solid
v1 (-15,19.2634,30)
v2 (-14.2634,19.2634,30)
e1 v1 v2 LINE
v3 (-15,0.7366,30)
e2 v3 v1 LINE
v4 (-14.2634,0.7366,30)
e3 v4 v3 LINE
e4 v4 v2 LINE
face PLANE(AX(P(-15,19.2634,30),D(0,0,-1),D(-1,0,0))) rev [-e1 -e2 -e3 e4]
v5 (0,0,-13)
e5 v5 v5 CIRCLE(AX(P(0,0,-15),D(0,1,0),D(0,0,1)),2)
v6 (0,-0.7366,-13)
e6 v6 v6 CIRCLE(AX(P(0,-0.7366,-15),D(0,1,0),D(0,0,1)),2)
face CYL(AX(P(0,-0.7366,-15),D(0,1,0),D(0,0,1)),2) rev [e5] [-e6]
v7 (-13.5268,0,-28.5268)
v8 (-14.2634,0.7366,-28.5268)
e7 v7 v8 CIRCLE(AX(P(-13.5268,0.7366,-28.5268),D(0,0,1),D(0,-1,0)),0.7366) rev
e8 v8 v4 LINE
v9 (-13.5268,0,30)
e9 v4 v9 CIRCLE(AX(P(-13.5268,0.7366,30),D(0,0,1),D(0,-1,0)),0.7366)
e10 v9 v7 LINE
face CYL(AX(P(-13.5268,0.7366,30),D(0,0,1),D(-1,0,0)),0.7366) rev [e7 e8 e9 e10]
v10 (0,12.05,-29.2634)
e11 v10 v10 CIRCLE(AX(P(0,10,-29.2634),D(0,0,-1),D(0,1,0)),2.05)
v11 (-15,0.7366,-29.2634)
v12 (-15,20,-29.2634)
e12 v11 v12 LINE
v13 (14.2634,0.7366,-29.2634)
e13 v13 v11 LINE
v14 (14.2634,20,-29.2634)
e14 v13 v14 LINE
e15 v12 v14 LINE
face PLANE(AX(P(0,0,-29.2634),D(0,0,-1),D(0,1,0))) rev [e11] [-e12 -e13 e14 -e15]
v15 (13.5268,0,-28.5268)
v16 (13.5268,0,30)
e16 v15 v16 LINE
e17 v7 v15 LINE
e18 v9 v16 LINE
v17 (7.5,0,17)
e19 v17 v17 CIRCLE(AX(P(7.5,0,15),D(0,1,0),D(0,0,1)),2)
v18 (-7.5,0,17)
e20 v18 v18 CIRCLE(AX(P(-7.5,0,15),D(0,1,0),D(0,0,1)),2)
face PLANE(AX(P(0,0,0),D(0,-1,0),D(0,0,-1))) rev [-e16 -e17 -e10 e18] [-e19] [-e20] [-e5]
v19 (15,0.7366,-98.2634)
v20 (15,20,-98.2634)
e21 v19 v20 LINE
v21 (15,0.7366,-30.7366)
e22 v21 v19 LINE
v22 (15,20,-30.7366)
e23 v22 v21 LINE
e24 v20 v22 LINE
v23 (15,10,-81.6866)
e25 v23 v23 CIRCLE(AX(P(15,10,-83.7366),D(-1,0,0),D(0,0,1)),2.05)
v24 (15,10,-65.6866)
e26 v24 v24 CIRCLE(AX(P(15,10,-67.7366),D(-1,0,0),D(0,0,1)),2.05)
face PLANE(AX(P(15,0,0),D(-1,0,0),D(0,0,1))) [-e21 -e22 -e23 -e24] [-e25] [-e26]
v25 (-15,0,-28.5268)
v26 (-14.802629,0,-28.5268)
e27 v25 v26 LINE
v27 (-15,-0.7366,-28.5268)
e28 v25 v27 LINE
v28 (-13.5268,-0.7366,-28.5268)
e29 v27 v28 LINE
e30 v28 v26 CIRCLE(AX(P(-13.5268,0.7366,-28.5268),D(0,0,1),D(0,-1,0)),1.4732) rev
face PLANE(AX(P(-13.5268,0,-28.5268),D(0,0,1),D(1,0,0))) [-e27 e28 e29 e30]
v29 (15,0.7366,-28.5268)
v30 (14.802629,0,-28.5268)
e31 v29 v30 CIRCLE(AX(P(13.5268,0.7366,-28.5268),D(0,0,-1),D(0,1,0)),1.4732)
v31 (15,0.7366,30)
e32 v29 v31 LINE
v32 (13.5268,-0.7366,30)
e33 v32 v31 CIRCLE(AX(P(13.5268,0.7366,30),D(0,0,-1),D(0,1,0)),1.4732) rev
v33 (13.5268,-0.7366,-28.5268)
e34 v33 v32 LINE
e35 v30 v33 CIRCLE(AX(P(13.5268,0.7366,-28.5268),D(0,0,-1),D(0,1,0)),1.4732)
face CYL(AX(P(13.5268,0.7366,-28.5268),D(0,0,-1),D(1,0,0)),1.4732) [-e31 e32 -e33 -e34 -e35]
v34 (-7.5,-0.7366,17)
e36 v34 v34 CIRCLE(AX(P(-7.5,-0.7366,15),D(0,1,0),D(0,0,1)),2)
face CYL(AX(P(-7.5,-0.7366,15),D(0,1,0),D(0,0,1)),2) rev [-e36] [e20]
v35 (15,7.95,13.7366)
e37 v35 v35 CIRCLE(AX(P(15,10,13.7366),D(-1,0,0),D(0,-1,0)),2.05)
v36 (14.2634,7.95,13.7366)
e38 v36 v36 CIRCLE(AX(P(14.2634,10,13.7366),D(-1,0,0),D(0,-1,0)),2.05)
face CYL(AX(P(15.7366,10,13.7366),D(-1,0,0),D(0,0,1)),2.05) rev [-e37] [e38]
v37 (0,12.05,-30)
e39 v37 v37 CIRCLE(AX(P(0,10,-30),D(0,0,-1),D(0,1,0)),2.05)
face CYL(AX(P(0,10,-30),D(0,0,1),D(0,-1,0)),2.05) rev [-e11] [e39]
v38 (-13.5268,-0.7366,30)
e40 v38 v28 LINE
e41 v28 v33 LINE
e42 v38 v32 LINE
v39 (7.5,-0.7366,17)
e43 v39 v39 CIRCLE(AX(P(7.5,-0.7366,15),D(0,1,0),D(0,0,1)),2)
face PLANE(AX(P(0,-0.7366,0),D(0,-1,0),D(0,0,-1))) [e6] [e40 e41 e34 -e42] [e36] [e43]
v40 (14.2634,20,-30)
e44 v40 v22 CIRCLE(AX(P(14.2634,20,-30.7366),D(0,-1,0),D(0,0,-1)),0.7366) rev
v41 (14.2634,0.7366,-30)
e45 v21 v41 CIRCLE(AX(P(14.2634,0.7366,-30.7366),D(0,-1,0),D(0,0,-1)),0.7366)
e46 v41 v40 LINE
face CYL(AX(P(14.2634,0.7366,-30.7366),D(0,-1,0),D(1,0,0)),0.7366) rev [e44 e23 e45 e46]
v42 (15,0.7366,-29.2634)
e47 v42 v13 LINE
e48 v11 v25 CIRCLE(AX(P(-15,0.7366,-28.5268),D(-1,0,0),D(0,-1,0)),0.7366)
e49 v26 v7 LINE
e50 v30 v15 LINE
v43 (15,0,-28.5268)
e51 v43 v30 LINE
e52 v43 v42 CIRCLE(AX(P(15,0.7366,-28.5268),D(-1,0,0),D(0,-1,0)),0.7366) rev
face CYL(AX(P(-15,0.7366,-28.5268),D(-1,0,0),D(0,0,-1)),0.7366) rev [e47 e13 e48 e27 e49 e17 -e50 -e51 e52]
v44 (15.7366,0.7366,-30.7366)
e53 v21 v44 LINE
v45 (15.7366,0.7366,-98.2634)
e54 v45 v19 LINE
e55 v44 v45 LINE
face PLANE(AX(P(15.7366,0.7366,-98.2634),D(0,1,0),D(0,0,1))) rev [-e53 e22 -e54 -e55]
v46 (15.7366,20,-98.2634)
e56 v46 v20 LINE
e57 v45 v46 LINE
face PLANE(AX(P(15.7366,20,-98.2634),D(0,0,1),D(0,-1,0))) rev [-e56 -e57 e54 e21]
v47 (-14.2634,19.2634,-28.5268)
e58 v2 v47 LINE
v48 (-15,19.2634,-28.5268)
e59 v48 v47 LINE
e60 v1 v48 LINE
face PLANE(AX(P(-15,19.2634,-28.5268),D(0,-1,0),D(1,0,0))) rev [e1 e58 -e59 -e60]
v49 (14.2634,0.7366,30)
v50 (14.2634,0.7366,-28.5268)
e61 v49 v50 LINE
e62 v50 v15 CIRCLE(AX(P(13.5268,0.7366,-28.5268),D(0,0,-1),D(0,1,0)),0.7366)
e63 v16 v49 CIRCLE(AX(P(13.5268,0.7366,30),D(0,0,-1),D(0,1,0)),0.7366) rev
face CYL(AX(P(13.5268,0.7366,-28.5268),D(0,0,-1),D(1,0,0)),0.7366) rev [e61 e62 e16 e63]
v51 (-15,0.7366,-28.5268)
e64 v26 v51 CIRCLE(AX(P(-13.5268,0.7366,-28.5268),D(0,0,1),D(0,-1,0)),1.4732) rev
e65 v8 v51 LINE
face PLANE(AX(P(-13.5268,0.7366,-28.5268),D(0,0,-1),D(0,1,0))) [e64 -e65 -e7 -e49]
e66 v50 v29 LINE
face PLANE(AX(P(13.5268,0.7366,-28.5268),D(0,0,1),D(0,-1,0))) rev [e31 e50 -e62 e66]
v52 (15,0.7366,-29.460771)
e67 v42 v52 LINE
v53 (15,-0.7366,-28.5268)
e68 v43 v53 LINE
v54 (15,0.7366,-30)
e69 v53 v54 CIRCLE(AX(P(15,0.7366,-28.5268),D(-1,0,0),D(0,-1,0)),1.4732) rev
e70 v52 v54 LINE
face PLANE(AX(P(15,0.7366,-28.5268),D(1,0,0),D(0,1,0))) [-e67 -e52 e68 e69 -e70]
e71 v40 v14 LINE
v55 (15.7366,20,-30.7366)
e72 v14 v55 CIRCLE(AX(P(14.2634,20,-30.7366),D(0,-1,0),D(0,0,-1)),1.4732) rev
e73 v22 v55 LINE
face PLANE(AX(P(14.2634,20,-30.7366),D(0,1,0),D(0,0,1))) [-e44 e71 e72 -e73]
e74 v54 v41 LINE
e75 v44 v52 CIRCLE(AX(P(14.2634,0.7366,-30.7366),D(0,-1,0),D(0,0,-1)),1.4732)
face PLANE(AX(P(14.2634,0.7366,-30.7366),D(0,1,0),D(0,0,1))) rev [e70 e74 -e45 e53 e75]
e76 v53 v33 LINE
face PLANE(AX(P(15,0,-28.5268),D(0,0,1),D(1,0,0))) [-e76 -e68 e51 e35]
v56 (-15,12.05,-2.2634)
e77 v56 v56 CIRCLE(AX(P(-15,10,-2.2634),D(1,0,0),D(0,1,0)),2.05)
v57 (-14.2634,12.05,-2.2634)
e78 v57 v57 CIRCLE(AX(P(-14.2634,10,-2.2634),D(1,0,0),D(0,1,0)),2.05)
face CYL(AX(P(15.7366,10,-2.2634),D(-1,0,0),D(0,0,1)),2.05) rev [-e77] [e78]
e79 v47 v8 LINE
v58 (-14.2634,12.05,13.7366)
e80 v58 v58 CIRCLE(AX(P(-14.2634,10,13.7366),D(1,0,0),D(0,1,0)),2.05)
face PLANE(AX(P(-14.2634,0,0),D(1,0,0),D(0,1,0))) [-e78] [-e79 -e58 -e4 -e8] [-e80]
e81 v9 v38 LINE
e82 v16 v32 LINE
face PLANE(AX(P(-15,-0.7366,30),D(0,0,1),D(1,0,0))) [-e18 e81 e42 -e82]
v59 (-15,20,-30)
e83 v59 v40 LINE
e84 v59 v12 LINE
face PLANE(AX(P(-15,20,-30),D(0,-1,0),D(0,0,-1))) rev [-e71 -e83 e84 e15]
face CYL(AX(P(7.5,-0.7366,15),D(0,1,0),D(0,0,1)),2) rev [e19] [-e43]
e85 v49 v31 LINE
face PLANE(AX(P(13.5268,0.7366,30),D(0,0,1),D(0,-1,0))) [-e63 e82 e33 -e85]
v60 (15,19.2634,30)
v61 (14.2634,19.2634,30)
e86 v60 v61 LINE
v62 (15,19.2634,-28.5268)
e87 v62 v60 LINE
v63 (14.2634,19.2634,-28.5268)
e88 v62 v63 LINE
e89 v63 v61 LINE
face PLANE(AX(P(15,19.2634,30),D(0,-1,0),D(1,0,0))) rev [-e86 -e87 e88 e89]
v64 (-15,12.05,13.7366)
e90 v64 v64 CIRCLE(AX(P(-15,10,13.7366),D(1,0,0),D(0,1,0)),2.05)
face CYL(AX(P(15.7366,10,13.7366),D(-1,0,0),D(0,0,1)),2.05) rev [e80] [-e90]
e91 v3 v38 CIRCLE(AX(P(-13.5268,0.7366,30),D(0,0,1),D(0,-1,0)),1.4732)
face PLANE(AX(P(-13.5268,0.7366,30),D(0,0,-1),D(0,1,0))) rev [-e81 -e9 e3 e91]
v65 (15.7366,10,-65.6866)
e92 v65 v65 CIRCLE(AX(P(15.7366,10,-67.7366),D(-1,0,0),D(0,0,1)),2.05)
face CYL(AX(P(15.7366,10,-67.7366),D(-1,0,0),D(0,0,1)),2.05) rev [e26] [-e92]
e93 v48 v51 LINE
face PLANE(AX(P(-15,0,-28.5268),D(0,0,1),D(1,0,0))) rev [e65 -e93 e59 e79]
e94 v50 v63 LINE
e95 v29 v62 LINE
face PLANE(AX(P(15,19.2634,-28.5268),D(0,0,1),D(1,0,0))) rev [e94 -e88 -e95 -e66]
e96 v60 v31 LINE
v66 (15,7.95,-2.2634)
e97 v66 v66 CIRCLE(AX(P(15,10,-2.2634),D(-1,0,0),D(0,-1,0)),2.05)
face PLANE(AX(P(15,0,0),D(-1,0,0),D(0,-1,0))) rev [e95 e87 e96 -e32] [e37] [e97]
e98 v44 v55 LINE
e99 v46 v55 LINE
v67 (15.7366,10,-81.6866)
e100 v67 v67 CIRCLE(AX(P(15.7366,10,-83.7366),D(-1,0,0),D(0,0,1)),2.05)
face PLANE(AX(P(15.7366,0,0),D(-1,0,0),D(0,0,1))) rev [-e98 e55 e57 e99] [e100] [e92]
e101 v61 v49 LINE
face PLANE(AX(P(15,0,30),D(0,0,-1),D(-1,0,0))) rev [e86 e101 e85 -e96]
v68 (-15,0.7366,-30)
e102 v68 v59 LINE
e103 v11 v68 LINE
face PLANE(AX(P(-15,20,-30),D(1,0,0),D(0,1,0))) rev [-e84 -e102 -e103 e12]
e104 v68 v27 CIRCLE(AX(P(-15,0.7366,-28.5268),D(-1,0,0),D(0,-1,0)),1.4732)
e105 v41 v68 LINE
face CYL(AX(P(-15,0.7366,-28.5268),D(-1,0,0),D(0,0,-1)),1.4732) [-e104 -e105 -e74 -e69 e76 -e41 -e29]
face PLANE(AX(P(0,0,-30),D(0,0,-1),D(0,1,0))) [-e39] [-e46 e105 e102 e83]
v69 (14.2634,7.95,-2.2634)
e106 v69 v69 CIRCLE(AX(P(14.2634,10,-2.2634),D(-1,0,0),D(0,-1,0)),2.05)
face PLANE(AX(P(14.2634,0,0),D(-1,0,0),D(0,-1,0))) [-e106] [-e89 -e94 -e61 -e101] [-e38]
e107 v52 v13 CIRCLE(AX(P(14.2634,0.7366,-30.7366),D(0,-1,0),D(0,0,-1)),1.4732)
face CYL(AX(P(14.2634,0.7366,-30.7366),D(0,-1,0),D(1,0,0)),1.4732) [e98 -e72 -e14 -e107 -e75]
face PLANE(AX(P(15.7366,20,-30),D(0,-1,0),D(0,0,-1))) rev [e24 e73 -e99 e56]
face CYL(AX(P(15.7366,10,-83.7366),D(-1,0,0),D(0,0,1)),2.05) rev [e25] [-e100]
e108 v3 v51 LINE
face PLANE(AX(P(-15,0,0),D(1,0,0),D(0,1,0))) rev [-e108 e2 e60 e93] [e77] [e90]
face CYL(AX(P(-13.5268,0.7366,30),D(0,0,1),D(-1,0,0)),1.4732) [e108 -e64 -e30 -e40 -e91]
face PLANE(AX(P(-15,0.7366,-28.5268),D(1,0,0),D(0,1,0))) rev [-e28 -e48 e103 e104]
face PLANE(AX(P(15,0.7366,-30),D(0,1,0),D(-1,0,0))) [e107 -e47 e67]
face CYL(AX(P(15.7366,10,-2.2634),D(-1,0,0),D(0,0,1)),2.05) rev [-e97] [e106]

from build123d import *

# Parameters (mm, degrees)
SKETCH1_W                    = 30
SKETCH1_H                    = 60
SKETCH1_R                    = 2
BASE_FLANGE1_DEPTH           = 0.7366
EDGE_FLANGE1_STRIP_W         = 4.4196
EDGE_FLANGE1_STRIP_H         = 0.7366
EDGE_FLANGE1_STRIP_CUT_DEPTH = 30
EDGE_FLANGE1_DEPTH           = 30
EDGE_FLANGE1_PROFILE_W       = 30
EDGE_FLANGE1_PROFILE_H       = 19.2634
EDGE_FLANGE1_PROFILE_R       = 2.05
EDGE_FLANGE1_FLAT_DEPTH      = 0.7366
EDGE_FLANGE2_STRIP_W         = 4.4196
EDGE_FLANGE2_STRIP_H         = 0.7366
EDGE_FLANGE2_STRIP_CUT_DEPTH = 58.5268
EDGE_FLANGE2_DEPTH           = 58.5268
EDGE_FLANGE3_STRIP_W         = 4.4196
EDGE_FLANGE3_STRIP_H         = 0.7366
EDGE_FLANGE3_STRIP_CUT_DEPTH = 58.5268
EDGE_FLANGE3_DEPTH           = 58.5268
EDGE_FLANGE4_STRIP_W         = 4.4196
EDGE_FLANGE4_STRIP_H         = 0.7366
EDGE_FLANGE4_STRIP_CUT_DEPTH = 19.2634
EDGE_FLANGE4_DEPTH           = 19.2634
SKETCH18_R                   = 2.05
CUT_EXTRUDE1_DEPTH           = 409.590672417


# Sheet-metal steps are written as plain solids
with BuildPart() as part:
    # Sketch1 → Base-Flange1 (new body)
    with BuildSketch(Plane(origin=(0, 0, 0), x_dir=(1, 0, 0), z_dir=(0, 1, 0))):
        Rectangle(SKETCH1_W, SKETCH1_H)
        with Locations(Location((7.5, -15, 0), (0, 0, 270))):
            Circle(SKETCH1_R, mode=Mode.SUBTRACT)
        with Locations(Location((0, 15, 0), (0, 0, 270))):
            Circle(SKETCH1_R, mode=Mode.SUBTRACT)
        with Locations(Location((-7.5, -15, 0), (0, 0, 270))):
            Circle(SKETCH1_R, mode=Mode.SUBTRACT)
    extrude(amount=-BASE_FLANGE1_DEPTH)

    # Edge-Flange1 strip (across the edge) → Edge-Flange1 strip cut (cut)
    with BuildSketch(Plane(origin=(15, 0, -30), x_dir=(0, 0, 1), z_dir=(-1, 0, 0))):
        with Locations((-0.7366, -0.3683)):
            Rectangle(EDGE_FLANGE1_STRIP_W, EDGE_FLANGE1_STRIP_H)
    extrude(amount=EDGE_FLANGE1_STRIP_CUT_DEPTH, mode=Mode.SUBTRACT)

    # Edge-Flange1 bend section (across the edge) → Edge-Flange1 (add)
    with BuildSketch(Plane(origin=(15, 0, -30), x_dir=(0, 0, 1), z_dir=(-1, 0, 0))):
        with BuildLine():
            Line((0, 0.7366), (0.7366, 0.7366))
            ThreePointArc((0.7366, 0.7366), (0.952345145, 0.215745145), (1.4732, 0))
            Line((1.4732, 0), (1.4732, -0.7366))
            ThreePointArc((1.4732, -0.7366), (0.43149029, -0.30510971), (0, 0.7366))
        make_face()
    extrude(amount=EDGE_FLANGE1_DEPTH)

    # Edge-Flange1 profile (on flange) → Edge-Flange1 flat (add)
    with BuildSketch(Plane(origin=(0, 0, -30), x_dir=(-1, 0, 0), z_dir=(0, 0, -1))):
        with Locations((0, 10.3683)):
            Rectangle(EDGE_FLANGE1_PROFILE_W, EDGE_FLANGE1_PROFILE_H)
        with Locations((0, 10)):
            Circle(EDGE_FLANGE1_PROFILE_R, mode=Mode.SUBTRACT)
    extrude(amount=-EDGE_FLANGE1_FLAT_DEPTH)

    # Edge-Flange2 strip (across the edge) → Edge-Flange2 strip cut (cut)
    with BuildSketch(Plane(origin=(15, 0, 30), x_dir=(-1, 0, 0), z_dir=(0, 0, -1))):
        with Locations((-0.7366, -0.3683)):
            Rectangle(EDGE_FLANGE2_STRIP_W, EDGE_FLANGE2_STRIP_H)
    extrude(amount=EDGE_FLANGE2_STRIP_CUT_DEPTH, mode=Mode.SUBTRACT)

    # Edge-Flange2 section (across the edge) → Edge-Flange2 (add)
    with BuildSketch(Plane(origin=(15, 0, 30), x_dir=(-1, 0, 0), z_dir=(0, 0, -1))):
        with BuildLine():
            Line((0, 0.7366), (0, 19.2634))
            Line((0, 19.2634), (0.7366, 19.2634))
            Line((0.7366, 19.2634), (0.7366, 0.7366))
            ThreePointArc((0.7366, 0.7366), (0.952345145, 0.215745145), (1.4732, 0))
            Line((1.4732, 0), (1.4732, -0.7366))
            ThreePointArc((1.4732, -0.7366), (0.43149029, -0.30510971), (0, 0.7366))
        make_face()
    extrude(amount=EDGE_FLANGE2_DEPTH)

    # Edge-Flange3 strip (across the edge) → Edge-Flange3 strip cut (cut)
    with BuildSketch(Plane(origin=(-15, 0, -28.5268), x_dir=(1, 0, 0), z_dir=(0, 0, 1))):
        with Locations((-0.7366, -0.3683)):
            Rectangle(EDGE_FLANGE3_STRIP_W, EDGE_FLANGE3_STRIP_H)
    extrude(amount=EDGE_FLANGE3_STRIP_CUT_DEPTH, mode=Mode.SUBTRACT)

    # Edge-Flange3 section (across the edge) → Edge-Flange3 (add)
    with BuildSketch(Plane(origin=(-15, 0, -28.5268), x_dir=(1, 0, 0), z_dir=(0, 0, 1))):
        with BuildLine():
            Line((0, 0.7366), (0, 19.2634))
            Line((0, 19.2634), (0.7366, 19.2634))
            Line((0.7366, 19.2634), (0.7366, 0.7366))
            ThreePointArc((0.7366, 0.7366), (0.952345145, 0.215745145), (1.4732, 0))
            Line((1.4732, 0), (1.4732, -0.7366))
            ThreePointArc((1.4732, -0.7366), (0.43149029, -0.30510971), (0, 0.7366))
        make_face()
    extrude(amount=EDGE_FLANGE3_DEPTH)

    # Edge-Flange4 strip (across the edge) → Edge-Flange4 strip cut (cut)
    with BuildSketch(Plane(origin=(15, 20, -30), x_dir=(-1, 0, 0), z_dir=(0, -1, 0))):
        with Locations((-1.4732, -0.3683)):
            Rectangle(EDGE_FLANGE4_STRIP_W, EDGE_FLANGE4_STRIP_H)
    extrude(amount=EDGE_FLANGE4_STRIP_CUT_DEPTH, mode=Mode.SUBTRACT)

    # Edge-Flange4 section (across the edge) → Edge-Flange4 (add)
    with BuildSketch(Plane(origin=(15, 20, -30), x_dir=(-1, 0, 0), z_dir=(0, -1, 0))):
        with BuildLine():
            Line((-0.7366, 0.7366), (-0.7366, 68.2634))
            Line((-0.7366, 68.2634), (0, 68.2634))
            Line((0, 68.2634), (0, 0.7366))
            ThreePointArc((0, 0.7366), (0.215745145, 0.215745145), (0.7366, 0))
            Line((0.7366, 0), (0.7366, -0.7366))
            ThreePointArc((0.7366, -0.7366), (-0.30510971, -0.30510971), (-0.7366, 0.7366))
        make_face()
    extrude(amount=EDGE_FLANGE4_DEPTH)

    # Sketch18 → Cut-Extrude1 (cut, through all)
    with BuildSketch(Plane(origin=(-385, -11.740421973, -25.126127563), x_dir=(0, 0, 1), z_dir=(-1, 0, 0))):
        with Locations((-42.610472437, 21.740421973)):
            Circle(SKETCH18_R)
        with Locations((-58.610472437, 21.740421973)):
            Circle(SKETCH18_R)
        with Locations(Location((22.862727563, 21.740421973, 0), (0, 0, 90))):
            Circle(SKETCH18_R)
        with Locations(Location((38.862727563, 21.740421973, 0), (0, 0, 90))):
            Circle(SKETCH18_R)
    extrude(amount=-CUT_EXTRUDE1_DEPTH, mode=Mode.SUBTRACT)


solid = part.part
